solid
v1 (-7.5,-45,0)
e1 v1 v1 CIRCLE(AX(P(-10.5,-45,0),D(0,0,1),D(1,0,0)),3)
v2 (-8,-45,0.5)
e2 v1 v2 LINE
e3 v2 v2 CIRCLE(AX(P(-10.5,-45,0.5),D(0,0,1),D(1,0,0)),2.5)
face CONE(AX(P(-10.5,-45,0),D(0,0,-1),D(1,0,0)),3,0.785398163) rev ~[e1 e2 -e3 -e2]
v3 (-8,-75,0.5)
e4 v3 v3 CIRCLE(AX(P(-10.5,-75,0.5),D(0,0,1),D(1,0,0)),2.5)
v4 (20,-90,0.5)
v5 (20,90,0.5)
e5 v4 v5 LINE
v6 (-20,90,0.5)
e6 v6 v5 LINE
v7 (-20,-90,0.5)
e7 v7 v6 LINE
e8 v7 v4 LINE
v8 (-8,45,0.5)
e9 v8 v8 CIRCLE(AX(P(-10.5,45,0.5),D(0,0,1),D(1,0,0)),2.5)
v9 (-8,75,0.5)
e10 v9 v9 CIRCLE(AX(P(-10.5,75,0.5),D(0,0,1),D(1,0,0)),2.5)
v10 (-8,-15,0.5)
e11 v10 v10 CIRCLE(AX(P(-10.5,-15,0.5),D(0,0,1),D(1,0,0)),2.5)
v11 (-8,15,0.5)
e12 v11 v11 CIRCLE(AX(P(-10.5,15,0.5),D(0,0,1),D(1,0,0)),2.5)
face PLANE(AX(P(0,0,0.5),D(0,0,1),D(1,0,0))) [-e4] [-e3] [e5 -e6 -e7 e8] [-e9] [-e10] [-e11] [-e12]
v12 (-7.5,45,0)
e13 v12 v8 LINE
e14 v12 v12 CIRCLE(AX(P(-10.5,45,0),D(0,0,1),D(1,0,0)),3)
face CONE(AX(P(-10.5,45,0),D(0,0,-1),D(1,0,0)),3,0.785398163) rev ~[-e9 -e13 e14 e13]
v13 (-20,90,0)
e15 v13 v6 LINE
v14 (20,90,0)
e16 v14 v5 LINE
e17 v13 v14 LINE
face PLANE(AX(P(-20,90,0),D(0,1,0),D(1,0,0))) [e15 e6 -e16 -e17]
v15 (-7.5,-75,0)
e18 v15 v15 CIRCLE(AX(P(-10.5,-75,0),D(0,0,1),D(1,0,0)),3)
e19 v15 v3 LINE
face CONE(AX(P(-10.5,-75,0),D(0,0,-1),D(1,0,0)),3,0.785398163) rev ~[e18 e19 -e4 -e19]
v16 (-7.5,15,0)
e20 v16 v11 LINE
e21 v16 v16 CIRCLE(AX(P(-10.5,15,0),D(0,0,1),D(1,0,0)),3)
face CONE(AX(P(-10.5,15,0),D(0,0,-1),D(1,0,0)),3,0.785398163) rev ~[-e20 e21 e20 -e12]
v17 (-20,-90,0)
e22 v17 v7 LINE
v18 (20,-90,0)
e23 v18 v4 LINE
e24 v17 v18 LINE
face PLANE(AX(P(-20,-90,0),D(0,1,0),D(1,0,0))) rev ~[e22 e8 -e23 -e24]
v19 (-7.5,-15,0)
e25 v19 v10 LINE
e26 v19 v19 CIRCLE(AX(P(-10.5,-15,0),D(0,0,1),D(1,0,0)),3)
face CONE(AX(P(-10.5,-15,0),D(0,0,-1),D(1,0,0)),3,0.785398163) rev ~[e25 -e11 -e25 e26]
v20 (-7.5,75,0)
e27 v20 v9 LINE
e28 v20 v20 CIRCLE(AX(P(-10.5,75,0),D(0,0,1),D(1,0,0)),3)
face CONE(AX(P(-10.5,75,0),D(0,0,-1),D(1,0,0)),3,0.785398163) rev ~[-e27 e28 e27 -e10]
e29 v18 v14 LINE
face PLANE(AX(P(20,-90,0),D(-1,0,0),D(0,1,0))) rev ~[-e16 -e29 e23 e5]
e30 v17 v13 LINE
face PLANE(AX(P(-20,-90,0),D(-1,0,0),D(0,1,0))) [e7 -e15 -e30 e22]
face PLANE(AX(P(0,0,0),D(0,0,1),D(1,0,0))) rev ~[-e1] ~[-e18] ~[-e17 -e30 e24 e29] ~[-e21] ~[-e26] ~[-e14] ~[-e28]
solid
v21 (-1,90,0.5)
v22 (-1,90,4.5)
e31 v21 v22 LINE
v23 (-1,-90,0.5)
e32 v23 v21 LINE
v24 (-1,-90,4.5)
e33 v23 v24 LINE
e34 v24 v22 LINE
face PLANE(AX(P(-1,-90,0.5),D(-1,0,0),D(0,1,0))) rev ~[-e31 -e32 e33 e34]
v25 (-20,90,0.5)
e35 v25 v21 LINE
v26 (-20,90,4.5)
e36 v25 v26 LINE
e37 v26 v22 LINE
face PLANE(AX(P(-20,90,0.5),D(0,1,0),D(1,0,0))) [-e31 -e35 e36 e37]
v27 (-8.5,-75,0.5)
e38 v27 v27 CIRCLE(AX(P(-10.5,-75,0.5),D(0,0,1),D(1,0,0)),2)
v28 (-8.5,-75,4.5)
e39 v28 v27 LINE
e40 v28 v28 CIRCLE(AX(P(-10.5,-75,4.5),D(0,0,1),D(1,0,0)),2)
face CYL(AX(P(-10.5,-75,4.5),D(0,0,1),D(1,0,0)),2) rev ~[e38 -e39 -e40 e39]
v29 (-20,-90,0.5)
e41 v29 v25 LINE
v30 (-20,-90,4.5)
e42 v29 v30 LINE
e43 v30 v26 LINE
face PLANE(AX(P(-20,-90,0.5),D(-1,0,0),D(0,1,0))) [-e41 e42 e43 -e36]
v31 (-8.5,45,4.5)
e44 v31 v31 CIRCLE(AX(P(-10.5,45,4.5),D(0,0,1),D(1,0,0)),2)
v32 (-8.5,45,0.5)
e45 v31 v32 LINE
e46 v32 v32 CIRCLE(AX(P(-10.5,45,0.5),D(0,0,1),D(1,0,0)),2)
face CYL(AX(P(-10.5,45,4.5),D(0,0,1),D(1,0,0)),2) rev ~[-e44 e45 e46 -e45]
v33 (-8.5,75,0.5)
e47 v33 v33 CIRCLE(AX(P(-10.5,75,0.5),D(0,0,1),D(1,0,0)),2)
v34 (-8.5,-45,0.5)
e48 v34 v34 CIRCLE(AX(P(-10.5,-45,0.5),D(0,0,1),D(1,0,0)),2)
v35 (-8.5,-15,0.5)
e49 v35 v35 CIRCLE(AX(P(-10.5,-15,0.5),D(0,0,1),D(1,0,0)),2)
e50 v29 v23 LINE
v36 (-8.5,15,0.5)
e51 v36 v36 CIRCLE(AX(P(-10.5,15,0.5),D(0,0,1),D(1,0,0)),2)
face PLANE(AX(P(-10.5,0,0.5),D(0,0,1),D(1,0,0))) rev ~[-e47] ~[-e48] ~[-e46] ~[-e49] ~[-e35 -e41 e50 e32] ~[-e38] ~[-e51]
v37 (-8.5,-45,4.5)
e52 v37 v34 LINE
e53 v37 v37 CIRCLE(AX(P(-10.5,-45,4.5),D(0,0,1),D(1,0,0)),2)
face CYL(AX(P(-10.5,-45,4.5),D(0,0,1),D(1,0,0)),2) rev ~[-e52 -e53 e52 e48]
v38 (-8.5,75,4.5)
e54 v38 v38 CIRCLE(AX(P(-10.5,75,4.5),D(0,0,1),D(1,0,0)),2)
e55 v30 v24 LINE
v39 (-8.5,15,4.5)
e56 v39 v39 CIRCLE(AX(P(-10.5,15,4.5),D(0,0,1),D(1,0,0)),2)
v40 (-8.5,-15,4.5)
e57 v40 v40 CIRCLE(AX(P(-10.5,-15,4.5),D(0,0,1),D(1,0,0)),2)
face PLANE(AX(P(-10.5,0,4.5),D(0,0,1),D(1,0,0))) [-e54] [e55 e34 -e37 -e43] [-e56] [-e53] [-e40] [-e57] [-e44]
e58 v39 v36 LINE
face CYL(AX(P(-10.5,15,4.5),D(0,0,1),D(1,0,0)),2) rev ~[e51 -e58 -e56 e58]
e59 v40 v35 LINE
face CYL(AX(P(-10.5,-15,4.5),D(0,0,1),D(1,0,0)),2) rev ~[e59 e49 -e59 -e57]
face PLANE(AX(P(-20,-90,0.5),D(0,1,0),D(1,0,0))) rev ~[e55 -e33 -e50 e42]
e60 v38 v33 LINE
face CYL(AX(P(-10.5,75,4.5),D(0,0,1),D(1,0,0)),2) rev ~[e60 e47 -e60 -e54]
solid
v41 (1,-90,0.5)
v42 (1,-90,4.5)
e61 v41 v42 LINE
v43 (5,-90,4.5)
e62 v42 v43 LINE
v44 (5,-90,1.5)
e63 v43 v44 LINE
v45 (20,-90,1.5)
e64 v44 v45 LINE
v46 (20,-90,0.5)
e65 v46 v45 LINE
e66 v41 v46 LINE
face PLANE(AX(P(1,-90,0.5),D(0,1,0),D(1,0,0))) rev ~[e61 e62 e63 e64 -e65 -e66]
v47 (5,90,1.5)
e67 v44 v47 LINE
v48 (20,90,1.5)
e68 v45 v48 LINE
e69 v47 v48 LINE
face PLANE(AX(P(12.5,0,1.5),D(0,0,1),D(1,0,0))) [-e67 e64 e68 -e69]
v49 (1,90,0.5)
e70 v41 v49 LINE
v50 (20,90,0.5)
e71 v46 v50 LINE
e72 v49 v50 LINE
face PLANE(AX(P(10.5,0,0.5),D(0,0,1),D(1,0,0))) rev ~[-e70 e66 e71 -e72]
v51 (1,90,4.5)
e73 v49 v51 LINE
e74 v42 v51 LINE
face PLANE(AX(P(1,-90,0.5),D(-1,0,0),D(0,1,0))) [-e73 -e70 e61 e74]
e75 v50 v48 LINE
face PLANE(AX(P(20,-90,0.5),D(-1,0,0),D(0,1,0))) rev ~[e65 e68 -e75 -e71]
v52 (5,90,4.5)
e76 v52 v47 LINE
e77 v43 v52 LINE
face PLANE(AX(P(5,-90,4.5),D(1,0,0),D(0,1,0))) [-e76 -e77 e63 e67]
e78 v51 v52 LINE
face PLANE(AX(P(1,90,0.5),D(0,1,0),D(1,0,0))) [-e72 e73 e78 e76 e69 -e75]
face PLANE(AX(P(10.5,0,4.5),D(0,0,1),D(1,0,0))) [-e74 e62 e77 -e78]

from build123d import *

# Parameters (mm, degrees)
F0_W     = 40
F0_H     = 180
F1_DEPTH = 0.5
F2_W     = 19
F2_H     = 180
F3_DEPTH = 4
F4_W     = 15
F4_H     = 180
F5_DEPTH = 3
F6_R     = 2
F7_DEPTH = 4.501


# Not quite as in the source:
# - a fillet or chamfer that OpenCascade refuses, or shapes differently, is made with other operations: its cross-section is extruded or revolved along the edge and cut away or added


with BuildPart() as f1:
    # F0 (on Top) → F1 (new body)
    with BuildSketch(Plane.XY):
        Rectangle(F0_W, F0_H)
    extrude(amount=F1_DEPTH)


with BuildPart() as f3:
    # F2 (on face) → F3 (new body)
    with BuildSketch(Plane.XY.offset(0.5)):
        with Locations((10.5, 0)):
            Rectangle(F2_W, F2_H)
    extrude(amount=F3_DEPTH)

    # F4 (on face) → F5 (cut)
    with BuildSketch(Plane.XY.offset(4.5)):
        with Locations((12.5, 0)):
            Rectangle(F4_W, F4_H)
    extrude(amount=-F5_DEPTH, mode=Mode.SUBTRACT)


with BuildPart() as f3b:
    # F2 (on face) → F3, piece 2 (new body)
    with BuildSketch(Plane.XY.offset(0.5)):
        with Locations((-10.5, 0)):
            Rectangle(F2_W, F2_H)
    extrude(amount=F3_DEPTH)


with BuildPart() as f7_tool:
    # F6 (on face) → F7 (new body, through all)
    with BuildSketch(Plane.XY.offset(4.5)):
        with Locations((-10.5, 15)):
            Circle(F6_R)
        with Locations((-10.5, 45)):
            Circle(F6_R)
        with Locations((-10.5, 75)):
            Circle(F6_R)
        with Locations((-10.5, -45)):
            Circle(F6_R)
        with Locations((-10.5, -15)):
            Circle(F6_R)
        with Locations((-10.5, -75)):
            Circle(F6_R)
    extrude(amount=-F7_DEPTH)


with BuildPart() as f1_1:
    add(f1.part)

    # F7: cut by f7_tool
    add(f7_tool.part, mode=Mode.SUBTRACT)

    # F8: chamfer of 1 on 6 edges, made by hand

    # F8_s1 → F8_t2 (revolve, cut)
    with BuildSketch(Plane.XZ.offset(75)):
        Polygon((-7.5, 0), (-8.5, 1), (-8.5, 0), align=None)
    revolve(axis=Axis((-10.5, -75, 0), (0, 0, 1)), mode=Mode.SUBTRACT)

    # F8_s3 → F8_t4 (revolve, cut)
    with BuildSketch(Plane.XZ.offset(45)):
        Polygon((-7.5, 0), (-8.5, 1), (-8.5, 0), align=None)
    revolve(axis=Axis((-10.5, -45, 0), (0, 0, 1)), mode=Mode.SUBTRACT)

    # F8_s5 → F8_t6 (revolve, cut)
    with BuildSketch(Plane.XZ.offset(15)):
        Polygon((-7.5, 0), (-8.5, 1), (-8.5, 0), align=None)
    revolve(axis=Axis((-10.5, -15, 0), (0, 0, 1)), mode=Mode.SUBTRACT)

    # F8_s7 → F8_t8 (revolve, cut)
    with BuildSketch(Plane.XZ.offset(-15)):
        Polygon((-7.5, 0), (-8.5, 1), (-8.5, 0), align=None)
    revolve(axis=Axis((-10.5, 15, 0), (0, 0, 1)), mode=Mode.SUBTRACT)

    # F8_s9 → F8_t10 (revolve, cut)
    with BuildSketch(Plane.XZ.offset(-45)):
        Polygon((-7.5, 0), (-8.5, 1), (-8.5, 0), align=None)
    revolve(axis=Axis((-10.5, 45, 0), (0, 0, 1)), mode=Mode.SUBTRACT)

    # F8_s11 → F8_t12 (revolve, cut)
    with BuildSketch(Plane.XZ.offset(-75)):
        Polygon((-7.5, 0), (-8.5, 1), (-8.5, 0), align=None)
    revolve(axis=Axis((-10.5, 75, 0), (0, 0, 1)), mode=Mode.SUBTRACT)


with BuildPart() as f3b_1:
    add(f3b.part)

    # F7: cut by f7_tool
    add(f7_tool.part, mode=Mode.SUBTRACT)


solid = Compound([f3.part, f1_1.part, f3b_1.part])
